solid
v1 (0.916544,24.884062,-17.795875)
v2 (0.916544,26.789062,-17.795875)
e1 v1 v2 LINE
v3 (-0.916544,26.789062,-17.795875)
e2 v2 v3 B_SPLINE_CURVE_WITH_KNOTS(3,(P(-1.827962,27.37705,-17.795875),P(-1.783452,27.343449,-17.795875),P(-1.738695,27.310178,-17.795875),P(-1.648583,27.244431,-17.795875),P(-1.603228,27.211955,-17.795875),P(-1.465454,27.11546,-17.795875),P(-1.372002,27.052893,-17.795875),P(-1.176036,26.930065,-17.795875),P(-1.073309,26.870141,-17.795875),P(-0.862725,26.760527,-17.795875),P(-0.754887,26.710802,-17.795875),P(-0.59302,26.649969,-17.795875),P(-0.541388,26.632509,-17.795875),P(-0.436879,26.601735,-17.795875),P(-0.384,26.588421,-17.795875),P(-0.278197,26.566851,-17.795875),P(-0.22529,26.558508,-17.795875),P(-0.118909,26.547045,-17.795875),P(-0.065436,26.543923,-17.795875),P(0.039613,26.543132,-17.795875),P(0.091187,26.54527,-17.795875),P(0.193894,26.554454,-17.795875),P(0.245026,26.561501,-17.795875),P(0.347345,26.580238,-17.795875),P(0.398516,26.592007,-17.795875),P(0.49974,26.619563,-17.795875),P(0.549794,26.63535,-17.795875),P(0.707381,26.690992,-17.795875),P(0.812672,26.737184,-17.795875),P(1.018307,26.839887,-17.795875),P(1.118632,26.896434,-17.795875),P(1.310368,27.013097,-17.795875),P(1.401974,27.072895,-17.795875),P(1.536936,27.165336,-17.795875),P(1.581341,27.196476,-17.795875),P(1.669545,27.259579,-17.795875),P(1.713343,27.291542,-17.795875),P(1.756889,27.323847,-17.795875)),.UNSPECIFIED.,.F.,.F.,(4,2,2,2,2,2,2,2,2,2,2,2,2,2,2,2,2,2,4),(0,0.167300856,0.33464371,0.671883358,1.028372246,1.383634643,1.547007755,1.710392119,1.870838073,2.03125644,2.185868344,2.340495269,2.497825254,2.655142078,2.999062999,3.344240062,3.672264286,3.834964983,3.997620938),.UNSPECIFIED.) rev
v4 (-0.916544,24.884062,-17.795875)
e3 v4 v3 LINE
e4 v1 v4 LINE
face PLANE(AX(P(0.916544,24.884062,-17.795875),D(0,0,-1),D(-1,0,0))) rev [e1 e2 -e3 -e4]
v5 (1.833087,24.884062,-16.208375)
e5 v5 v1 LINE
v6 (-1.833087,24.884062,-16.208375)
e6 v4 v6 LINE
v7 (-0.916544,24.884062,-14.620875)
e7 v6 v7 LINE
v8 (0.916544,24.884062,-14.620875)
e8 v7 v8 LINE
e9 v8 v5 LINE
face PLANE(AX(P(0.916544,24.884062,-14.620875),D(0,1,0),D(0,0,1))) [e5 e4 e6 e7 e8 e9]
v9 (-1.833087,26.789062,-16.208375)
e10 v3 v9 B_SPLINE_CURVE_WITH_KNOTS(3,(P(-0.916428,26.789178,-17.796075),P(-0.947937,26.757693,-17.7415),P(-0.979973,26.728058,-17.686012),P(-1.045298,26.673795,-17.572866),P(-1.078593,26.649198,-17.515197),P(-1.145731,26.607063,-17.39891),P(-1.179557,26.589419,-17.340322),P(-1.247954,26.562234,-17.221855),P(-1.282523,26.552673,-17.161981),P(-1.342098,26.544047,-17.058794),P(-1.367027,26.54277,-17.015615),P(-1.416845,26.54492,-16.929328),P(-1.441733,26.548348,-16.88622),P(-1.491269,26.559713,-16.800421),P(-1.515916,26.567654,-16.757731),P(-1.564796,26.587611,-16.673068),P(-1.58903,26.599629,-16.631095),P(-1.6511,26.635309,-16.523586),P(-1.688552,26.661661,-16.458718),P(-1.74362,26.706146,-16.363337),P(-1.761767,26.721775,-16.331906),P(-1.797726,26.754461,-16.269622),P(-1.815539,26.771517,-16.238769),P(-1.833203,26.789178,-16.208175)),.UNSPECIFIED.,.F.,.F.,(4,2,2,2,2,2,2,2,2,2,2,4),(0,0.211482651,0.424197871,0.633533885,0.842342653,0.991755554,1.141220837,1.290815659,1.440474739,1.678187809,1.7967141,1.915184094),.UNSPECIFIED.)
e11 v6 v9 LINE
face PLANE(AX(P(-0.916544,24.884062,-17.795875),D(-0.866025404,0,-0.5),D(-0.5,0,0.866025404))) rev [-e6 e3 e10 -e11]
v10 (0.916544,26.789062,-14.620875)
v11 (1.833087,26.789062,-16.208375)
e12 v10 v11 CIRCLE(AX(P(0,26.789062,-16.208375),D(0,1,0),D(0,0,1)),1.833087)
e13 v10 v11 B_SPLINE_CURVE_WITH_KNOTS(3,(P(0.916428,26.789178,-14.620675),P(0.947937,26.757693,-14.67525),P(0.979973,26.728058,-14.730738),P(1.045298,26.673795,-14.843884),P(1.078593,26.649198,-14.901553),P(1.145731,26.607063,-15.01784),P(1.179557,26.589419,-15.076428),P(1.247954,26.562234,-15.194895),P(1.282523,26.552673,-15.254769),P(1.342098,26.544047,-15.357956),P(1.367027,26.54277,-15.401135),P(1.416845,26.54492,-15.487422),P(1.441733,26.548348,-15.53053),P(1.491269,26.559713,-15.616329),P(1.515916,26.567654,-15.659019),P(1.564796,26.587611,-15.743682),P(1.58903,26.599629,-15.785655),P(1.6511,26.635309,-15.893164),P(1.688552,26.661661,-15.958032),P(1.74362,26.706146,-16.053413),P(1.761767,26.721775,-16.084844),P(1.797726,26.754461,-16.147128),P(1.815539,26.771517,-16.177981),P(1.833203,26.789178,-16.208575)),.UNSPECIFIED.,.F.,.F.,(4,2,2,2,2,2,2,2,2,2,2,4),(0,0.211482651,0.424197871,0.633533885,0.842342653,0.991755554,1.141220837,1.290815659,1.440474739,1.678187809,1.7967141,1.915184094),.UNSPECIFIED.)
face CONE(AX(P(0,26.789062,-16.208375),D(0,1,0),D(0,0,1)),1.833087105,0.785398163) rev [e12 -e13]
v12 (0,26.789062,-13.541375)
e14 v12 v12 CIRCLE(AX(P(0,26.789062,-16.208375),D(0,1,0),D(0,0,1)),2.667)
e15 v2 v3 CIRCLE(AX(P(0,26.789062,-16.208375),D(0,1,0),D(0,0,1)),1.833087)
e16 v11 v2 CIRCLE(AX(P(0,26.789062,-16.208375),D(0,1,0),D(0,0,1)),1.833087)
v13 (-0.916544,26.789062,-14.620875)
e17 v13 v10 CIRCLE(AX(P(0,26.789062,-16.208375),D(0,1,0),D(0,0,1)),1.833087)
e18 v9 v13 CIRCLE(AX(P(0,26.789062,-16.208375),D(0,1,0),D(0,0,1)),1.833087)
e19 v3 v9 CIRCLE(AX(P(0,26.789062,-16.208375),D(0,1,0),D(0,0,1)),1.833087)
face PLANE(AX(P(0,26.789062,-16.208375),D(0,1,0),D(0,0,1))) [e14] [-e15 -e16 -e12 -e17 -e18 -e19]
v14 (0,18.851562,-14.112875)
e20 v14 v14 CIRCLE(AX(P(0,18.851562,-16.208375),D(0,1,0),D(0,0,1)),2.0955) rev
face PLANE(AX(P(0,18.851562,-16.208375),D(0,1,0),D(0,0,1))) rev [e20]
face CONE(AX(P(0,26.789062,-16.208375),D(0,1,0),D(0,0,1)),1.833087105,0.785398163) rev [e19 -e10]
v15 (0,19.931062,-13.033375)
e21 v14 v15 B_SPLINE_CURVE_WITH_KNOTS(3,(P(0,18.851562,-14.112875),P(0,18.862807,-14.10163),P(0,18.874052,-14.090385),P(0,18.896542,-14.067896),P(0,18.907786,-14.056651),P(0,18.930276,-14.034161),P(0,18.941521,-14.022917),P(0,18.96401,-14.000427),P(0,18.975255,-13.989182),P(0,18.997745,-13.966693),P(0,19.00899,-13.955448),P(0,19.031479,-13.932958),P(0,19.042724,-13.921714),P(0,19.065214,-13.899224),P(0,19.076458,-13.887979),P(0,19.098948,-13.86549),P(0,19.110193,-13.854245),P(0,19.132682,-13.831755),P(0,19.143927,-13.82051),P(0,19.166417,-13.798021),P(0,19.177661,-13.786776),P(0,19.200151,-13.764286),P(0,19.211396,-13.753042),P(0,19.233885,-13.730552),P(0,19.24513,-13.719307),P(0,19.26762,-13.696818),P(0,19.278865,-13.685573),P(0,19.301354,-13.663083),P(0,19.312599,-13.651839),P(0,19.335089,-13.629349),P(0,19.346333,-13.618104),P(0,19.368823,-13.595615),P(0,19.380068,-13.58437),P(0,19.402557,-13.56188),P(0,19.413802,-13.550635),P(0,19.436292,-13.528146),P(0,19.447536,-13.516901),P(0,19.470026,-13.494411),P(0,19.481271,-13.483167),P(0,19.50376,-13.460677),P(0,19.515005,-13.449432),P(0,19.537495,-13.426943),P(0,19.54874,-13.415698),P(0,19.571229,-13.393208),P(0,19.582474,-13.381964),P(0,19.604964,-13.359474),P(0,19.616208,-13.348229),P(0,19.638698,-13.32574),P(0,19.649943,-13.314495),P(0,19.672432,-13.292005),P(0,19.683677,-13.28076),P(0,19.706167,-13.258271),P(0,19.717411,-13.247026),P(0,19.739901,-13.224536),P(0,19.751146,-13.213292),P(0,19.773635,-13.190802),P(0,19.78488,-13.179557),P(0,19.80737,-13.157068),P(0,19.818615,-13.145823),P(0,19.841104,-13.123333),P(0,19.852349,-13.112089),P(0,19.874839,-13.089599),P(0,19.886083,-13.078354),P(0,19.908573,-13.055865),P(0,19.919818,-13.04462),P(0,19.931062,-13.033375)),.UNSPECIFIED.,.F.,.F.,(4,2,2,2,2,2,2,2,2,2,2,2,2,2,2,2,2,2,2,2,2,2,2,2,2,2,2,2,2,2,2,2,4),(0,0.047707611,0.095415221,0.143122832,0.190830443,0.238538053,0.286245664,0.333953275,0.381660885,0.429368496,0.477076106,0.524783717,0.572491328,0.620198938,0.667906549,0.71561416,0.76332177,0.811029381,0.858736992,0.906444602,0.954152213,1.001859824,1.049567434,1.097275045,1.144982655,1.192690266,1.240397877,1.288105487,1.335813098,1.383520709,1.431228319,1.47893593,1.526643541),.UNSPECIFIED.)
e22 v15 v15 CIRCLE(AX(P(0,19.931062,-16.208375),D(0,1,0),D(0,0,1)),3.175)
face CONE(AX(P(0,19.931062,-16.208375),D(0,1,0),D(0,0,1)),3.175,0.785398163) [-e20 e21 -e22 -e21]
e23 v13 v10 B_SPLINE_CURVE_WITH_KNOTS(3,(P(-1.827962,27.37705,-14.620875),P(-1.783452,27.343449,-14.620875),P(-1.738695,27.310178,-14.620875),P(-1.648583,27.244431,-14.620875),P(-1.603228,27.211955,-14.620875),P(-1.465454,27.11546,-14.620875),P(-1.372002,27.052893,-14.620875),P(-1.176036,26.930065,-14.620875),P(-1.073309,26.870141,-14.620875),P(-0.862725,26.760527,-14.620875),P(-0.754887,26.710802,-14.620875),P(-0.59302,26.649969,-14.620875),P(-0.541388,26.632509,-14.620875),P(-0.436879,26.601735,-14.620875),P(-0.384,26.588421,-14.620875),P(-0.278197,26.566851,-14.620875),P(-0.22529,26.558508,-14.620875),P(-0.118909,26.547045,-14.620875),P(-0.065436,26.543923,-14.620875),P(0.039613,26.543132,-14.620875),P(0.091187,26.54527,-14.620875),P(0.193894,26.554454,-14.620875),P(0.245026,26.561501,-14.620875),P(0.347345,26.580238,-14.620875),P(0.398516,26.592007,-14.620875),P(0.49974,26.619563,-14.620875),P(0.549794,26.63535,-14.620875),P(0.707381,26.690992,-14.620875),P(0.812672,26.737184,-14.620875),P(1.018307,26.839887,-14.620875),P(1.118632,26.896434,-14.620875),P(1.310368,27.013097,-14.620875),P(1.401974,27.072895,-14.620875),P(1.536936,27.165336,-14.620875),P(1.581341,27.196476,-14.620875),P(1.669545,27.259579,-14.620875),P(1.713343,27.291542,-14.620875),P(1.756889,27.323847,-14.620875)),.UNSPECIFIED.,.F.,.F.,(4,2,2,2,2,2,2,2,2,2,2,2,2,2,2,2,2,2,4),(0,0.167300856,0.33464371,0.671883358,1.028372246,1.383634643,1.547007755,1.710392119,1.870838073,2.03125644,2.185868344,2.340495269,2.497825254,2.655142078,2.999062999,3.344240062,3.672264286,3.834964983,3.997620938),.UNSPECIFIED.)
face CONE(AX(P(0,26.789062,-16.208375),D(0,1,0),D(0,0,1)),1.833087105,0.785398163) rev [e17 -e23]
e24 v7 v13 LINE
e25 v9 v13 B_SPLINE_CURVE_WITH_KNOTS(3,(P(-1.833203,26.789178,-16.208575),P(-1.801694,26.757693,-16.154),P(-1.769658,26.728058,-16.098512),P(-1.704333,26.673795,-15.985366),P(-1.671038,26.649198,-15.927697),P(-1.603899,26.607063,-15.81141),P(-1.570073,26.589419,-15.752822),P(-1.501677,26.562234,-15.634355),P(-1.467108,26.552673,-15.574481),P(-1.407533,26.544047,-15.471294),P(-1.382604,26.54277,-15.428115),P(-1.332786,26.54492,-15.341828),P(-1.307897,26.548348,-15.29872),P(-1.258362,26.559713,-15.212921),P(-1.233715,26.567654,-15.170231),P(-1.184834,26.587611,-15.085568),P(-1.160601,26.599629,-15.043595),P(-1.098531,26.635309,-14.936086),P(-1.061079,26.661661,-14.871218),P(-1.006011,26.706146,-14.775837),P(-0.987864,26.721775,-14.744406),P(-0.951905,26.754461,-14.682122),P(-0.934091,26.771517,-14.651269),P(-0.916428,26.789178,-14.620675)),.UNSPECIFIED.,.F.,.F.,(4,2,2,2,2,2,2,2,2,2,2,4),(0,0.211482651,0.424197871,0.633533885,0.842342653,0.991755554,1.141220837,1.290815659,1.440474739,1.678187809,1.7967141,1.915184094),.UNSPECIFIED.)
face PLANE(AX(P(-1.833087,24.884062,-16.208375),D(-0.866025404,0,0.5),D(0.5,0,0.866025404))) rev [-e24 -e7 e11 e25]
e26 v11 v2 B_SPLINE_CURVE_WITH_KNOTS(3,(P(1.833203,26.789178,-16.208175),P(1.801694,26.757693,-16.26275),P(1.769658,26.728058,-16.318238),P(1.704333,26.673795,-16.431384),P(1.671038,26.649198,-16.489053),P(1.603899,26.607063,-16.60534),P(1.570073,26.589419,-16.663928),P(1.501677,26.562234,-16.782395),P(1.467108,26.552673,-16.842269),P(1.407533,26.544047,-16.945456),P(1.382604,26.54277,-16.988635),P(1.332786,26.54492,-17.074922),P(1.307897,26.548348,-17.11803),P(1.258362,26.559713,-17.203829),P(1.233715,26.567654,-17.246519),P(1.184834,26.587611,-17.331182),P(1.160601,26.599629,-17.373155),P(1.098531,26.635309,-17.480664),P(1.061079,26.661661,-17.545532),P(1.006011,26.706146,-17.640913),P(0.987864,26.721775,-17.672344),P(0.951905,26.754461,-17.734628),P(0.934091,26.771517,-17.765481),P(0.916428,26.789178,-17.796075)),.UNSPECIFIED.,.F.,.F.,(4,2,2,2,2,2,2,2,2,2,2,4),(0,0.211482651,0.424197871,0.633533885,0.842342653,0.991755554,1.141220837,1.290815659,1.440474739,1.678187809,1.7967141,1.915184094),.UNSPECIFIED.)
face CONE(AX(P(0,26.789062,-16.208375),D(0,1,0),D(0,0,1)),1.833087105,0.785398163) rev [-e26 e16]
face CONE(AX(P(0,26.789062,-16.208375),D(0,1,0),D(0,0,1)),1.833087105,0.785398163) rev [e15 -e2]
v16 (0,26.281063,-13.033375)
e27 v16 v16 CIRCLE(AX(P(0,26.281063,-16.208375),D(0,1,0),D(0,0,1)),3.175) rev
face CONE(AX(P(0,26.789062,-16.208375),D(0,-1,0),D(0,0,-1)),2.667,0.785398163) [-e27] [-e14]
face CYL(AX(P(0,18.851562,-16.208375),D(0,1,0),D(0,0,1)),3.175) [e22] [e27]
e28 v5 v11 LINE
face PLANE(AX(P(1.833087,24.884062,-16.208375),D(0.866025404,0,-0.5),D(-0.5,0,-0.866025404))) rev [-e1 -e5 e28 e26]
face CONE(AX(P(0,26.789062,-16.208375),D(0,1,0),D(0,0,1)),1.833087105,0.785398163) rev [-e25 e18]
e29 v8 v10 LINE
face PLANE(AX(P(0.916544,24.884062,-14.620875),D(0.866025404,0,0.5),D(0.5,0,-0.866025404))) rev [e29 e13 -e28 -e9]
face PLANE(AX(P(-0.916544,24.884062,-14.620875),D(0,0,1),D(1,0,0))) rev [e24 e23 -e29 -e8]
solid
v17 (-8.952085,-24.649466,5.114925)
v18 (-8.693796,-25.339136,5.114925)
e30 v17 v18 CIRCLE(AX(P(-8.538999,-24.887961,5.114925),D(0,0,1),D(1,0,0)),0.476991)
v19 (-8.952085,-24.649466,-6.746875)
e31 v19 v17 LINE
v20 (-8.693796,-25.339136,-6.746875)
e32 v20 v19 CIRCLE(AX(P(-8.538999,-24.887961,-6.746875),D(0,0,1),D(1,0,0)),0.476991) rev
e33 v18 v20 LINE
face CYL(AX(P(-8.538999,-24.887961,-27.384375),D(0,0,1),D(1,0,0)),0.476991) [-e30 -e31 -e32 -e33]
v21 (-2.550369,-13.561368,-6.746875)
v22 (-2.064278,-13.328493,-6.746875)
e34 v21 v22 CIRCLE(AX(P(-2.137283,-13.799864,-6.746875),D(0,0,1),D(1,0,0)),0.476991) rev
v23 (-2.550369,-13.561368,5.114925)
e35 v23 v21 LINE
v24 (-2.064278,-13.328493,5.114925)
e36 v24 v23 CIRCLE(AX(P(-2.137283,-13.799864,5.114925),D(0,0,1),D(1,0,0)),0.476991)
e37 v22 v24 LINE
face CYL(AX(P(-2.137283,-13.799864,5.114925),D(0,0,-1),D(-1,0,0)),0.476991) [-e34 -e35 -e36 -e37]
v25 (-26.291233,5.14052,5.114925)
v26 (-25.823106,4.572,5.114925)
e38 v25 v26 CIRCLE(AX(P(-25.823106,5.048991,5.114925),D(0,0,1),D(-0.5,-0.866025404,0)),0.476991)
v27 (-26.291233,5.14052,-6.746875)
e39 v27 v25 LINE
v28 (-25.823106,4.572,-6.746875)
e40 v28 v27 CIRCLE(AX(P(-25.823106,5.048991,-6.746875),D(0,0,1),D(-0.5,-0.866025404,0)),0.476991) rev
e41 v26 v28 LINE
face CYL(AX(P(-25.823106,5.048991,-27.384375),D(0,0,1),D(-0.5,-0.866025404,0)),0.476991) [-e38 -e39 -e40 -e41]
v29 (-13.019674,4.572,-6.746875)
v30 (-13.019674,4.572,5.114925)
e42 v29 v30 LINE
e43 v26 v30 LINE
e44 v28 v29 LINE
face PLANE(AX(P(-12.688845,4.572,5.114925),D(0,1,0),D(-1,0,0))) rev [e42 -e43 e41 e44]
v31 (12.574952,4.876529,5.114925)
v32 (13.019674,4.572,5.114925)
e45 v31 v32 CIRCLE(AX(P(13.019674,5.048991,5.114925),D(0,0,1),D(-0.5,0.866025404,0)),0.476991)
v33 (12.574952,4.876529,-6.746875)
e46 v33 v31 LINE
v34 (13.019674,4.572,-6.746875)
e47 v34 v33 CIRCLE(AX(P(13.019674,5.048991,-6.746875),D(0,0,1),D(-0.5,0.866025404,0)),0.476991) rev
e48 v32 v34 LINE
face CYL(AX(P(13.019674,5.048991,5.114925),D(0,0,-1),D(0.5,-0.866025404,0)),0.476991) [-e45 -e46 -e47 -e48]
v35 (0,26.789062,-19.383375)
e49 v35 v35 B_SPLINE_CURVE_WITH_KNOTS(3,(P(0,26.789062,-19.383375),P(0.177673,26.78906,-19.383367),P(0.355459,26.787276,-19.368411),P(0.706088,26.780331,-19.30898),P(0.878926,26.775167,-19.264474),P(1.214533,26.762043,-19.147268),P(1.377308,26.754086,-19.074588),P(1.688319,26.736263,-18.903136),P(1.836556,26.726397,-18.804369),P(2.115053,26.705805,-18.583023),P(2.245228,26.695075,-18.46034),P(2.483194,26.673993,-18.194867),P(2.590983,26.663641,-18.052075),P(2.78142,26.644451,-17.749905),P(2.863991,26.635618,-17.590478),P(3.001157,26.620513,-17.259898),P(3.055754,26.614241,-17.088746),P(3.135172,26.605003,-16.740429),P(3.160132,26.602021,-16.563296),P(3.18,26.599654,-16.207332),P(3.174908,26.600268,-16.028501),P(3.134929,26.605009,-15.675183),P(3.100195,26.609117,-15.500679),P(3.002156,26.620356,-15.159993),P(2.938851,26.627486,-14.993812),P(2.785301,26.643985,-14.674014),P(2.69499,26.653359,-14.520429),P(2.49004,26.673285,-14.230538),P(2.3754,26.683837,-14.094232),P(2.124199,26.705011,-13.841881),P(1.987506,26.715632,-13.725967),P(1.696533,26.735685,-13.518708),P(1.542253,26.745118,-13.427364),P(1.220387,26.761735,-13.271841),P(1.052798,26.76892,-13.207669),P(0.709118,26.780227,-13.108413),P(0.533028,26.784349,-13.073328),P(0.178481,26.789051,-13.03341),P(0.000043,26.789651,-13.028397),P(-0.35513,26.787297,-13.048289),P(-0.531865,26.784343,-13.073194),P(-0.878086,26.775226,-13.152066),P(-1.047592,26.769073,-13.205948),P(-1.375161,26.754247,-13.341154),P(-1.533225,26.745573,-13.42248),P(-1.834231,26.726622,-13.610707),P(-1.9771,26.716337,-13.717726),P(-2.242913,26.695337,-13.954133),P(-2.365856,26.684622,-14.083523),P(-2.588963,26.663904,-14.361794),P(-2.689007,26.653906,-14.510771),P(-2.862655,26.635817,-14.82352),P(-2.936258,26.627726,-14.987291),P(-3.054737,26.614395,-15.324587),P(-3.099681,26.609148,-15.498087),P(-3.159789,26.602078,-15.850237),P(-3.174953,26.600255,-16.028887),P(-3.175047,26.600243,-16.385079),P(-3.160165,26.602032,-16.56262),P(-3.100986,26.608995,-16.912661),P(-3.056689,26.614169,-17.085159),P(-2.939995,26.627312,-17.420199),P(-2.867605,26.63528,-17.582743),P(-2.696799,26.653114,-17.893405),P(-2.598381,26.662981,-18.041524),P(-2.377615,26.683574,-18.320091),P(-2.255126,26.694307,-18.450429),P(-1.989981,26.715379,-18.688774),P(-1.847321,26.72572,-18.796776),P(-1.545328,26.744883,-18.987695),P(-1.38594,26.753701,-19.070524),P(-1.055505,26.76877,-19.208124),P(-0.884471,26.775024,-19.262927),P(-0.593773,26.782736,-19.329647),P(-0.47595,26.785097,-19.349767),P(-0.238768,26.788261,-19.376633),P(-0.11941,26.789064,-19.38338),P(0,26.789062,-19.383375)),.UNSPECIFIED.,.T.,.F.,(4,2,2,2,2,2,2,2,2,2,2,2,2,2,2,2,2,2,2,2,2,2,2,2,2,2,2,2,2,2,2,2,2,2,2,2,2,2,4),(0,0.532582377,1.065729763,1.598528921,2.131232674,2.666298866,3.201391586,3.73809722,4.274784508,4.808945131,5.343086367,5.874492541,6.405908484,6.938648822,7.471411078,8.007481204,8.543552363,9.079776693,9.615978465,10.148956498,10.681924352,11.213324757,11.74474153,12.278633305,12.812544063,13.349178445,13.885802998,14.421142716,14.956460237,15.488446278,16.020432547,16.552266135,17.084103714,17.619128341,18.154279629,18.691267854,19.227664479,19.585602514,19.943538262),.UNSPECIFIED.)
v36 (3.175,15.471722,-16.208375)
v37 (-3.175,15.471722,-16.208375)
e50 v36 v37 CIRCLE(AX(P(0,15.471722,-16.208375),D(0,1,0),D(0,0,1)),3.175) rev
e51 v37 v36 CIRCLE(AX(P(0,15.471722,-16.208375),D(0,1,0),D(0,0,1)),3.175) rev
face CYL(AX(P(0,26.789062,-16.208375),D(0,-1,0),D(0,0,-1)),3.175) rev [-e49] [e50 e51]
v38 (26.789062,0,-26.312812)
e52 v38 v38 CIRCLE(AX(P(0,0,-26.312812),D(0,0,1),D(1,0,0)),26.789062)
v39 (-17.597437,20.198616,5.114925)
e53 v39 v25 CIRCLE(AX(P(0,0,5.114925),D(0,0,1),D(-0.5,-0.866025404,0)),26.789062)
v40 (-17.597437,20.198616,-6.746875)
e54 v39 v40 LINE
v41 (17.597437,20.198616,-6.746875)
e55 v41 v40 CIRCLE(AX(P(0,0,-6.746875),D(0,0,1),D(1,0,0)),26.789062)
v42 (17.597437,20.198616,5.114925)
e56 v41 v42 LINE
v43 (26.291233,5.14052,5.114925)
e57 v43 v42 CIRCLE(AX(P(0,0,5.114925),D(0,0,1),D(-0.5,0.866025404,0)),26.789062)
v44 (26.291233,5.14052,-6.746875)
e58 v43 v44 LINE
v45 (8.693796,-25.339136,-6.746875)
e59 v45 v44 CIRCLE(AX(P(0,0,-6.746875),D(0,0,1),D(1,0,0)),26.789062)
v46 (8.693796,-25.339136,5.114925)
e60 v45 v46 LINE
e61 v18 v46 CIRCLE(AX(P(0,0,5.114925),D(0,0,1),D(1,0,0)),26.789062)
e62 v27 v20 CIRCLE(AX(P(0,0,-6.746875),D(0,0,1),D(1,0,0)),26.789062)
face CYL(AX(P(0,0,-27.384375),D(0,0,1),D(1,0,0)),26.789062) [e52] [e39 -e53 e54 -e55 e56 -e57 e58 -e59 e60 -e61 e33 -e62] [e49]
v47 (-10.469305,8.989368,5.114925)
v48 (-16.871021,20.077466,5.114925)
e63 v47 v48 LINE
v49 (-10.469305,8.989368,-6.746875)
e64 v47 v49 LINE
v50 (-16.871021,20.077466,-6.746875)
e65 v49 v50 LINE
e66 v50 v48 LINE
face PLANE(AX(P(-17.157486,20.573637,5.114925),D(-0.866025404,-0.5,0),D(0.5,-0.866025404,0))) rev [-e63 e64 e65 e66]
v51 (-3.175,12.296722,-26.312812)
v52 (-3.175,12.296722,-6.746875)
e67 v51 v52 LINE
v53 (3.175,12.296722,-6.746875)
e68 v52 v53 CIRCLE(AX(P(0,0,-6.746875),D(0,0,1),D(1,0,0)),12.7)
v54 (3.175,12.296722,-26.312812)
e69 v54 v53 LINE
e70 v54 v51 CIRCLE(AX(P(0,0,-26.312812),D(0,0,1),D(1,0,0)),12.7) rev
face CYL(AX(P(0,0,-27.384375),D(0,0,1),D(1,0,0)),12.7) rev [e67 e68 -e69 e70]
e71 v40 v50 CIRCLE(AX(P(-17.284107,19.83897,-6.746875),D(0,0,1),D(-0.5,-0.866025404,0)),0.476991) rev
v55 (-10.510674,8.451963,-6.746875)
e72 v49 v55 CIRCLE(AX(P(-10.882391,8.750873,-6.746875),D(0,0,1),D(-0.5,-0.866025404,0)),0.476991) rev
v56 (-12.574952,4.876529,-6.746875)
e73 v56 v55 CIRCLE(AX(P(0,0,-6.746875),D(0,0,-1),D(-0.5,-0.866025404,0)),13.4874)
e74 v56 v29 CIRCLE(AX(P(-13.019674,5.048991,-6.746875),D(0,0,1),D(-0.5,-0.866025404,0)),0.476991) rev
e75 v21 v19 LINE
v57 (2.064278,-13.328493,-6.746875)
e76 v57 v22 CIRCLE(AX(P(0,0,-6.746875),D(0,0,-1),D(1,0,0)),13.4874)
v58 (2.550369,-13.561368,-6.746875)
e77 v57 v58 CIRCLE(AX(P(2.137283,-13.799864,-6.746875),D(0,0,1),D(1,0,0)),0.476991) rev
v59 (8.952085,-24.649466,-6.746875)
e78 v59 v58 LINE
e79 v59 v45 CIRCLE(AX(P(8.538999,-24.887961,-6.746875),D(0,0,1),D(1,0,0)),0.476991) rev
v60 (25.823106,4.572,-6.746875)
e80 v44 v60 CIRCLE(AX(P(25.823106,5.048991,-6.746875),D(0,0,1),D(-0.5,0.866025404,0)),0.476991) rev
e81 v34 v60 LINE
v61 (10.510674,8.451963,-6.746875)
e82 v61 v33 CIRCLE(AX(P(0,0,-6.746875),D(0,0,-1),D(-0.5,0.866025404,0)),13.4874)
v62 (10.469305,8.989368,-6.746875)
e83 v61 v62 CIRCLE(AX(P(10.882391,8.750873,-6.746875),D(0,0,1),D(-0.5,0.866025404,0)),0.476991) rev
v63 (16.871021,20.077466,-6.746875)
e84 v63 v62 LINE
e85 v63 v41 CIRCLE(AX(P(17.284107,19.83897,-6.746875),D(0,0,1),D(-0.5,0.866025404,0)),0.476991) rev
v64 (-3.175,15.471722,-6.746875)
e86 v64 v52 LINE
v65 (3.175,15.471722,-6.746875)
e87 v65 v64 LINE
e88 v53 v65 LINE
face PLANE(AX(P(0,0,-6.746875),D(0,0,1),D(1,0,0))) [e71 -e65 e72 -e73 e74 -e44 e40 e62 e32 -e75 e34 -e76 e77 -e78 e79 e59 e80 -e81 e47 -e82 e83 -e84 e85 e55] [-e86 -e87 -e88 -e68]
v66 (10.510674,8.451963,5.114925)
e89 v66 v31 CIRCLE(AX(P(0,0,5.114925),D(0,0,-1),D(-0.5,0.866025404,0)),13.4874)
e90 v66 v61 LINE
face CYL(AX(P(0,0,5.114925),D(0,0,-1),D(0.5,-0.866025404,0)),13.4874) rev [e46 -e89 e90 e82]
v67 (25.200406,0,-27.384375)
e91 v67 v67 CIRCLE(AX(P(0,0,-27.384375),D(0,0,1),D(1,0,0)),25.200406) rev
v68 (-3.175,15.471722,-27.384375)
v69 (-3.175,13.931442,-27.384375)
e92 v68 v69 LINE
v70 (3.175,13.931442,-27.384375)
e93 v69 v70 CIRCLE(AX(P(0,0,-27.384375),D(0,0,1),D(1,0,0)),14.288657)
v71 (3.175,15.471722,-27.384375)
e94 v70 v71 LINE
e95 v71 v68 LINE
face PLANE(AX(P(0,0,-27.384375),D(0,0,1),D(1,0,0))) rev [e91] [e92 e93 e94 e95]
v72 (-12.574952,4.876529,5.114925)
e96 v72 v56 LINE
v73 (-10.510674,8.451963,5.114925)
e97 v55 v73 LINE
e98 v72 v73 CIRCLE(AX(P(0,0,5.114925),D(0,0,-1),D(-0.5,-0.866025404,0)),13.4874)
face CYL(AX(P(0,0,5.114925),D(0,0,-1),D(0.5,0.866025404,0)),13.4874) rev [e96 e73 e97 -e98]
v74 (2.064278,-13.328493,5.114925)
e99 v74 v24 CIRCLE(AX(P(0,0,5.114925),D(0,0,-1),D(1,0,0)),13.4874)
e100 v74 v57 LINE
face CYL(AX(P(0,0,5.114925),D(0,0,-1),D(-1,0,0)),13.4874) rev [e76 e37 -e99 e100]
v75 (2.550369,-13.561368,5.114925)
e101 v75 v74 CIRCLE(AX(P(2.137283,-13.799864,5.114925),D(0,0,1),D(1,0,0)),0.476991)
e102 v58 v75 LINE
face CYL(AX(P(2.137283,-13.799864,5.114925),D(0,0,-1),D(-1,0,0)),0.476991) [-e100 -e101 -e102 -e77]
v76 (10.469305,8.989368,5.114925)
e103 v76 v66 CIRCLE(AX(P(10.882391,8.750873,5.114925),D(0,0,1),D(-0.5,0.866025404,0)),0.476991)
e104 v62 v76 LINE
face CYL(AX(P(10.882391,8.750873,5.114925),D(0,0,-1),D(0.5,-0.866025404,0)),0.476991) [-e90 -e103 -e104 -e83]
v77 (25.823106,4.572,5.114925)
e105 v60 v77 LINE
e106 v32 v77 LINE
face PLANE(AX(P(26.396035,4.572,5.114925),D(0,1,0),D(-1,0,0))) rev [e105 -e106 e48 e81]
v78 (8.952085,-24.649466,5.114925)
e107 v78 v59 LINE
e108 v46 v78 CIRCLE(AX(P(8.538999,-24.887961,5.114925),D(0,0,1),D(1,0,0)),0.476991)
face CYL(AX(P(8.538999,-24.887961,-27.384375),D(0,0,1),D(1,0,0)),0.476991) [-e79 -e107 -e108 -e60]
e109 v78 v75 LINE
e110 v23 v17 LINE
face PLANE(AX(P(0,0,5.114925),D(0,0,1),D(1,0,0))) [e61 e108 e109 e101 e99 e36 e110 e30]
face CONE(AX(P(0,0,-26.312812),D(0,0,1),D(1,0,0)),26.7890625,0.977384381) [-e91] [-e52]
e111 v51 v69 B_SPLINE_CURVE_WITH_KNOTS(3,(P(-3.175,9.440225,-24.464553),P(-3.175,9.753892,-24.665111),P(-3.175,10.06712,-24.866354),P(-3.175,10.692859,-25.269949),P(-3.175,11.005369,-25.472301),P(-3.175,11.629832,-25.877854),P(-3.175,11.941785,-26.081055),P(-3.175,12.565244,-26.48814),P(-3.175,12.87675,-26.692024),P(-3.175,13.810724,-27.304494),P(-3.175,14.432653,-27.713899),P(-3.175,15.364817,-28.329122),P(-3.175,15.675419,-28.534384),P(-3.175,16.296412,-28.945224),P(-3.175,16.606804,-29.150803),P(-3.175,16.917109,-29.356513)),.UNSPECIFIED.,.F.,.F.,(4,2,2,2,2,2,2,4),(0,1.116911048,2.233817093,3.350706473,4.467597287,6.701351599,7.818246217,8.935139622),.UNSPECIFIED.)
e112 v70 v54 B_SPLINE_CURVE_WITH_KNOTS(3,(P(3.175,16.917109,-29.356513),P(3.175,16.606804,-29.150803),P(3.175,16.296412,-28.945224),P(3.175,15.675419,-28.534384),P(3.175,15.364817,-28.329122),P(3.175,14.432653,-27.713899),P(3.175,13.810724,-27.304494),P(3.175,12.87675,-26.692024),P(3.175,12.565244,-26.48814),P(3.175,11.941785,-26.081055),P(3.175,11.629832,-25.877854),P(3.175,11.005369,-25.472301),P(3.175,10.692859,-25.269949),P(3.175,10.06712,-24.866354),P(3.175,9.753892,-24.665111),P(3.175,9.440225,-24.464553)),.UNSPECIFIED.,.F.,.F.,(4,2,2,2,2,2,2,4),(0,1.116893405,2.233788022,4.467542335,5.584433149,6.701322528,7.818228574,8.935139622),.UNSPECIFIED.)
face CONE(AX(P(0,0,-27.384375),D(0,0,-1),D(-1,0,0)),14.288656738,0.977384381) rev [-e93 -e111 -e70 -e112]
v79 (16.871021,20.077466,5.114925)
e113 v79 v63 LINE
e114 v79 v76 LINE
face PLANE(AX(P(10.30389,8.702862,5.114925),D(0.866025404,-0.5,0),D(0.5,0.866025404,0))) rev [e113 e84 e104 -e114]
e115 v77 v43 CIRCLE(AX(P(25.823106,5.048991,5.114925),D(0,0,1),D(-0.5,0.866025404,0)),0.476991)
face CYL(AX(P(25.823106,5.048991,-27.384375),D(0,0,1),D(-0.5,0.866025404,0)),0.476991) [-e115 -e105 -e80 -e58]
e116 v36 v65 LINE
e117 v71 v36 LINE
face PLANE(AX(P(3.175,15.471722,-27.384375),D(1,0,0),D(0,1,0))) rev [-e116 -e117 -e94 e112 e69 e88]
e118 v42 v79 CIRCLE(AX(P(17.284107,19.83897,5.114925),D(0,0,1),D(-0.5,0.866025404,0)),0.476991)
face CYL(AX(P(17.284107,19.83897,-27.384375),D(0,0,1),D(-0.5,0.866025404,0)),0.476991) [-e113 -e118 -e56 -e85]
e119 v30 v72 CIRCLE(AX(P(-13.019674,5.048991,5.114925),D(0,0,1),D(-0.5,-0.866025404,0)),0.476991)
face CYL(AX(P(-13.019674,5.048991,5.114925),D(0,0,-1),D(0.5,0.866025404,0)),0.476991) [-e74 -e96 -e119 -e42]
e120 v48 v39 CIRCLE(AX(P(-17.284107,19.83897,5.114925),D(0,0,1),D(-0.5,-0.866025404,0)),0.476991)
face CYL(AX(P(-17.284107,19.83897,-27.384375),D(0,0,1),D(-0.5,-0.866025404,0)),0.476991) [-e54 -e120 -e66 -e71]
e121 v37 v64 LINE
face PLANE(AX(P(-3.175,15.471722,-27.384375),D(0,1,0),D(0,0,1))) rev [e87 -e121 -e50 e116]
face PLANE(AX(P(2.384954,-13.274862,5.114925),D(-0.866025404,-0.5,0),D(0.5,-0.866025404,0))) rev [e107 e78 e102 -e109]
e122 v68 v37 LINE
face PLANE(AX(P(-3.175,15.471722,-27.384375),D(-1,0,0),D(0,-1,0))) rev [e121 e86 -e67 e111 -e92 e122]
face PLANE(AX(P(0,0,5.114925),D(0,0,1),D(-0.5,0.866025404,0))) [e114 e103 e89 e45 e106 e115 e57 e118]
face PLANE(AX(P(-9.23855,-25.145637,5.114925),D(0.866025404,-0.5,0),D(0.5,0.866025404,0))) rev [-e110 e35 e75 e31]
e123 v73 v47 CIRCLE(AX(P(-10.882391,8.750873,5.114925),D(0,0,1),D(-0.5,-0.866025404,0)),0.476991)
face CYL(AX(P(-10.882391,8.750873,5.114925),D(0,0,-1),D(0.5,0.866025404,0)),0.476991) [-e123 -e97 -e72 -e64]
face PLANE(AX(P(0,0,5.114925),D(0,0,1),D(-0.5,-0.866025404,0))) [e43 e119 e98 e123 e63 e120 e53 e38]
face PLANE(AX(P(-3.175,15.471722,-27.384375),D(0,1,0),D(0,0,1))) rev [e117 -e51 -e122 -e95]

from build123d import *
from OCP.BRepFilletAPI import BRepFilletAPI_MakeChamfer

# Parameters (mm, degrees)
BOSS_EXTRUDE1_START      = -6.746875
SKETCH1_R                = 26.7890625
BOSS_EXTRUDE1_DEPTH      = 20.6375
BOSS_EXTRUDE2_DEPTH      = 11.8618
FILLET1_R                = 0.476990821
CIRPATTERN1_COUNT        = 3
FILLET1_OF_CIRPATTERN1_R = 0.476990821
CUT_EXTRUDE5_DEPTH       = 47.746248335
CUT_EXTRUDE5_DEPTH_BACK  = 47.746248335
SKETCH15_R               = 12.7
CHAMFER1_SIZE            = 1.0715625
CHAMFER1_SIZE2           = 1.588656738
CUT_EXTRUDE1_DEPTH       = 47.746248335
CUT_EXTRUDE1_DEPTH_BACK  = 47.746248335
SKETCH5_R                = 3.175
CUT_EXTRUDE2_DEPTH       = 47.746248335
SKETCH6_R                = 3.175
BOSS_EXTRUDE3_DEPTH      = 7.9375
CUT_EXTRUDE3_DEPTH       = 1.905
CHAMFER3_SIZE            = 0.508
CHAMFER4_SIZE            = 1.0795


with BuildPart() as part:
    # Sketch1 → Boss-Extrude1 (new body)
    with BuildSketch(Plane.XY.offset(BOSS_EXTRUDE1_START)):
        Circle(SKETCH1_R)
    extrude(amount=-BOSS_EXTRUDE1_DEPTH)

    # Sketch2 → Boss-Extrude2 (add)
    with BuildSketch(Plane.XY.offset(-6.746875)):
        with BuildLine():
            Line((-9.238549561, -25.145637229), (-2.384954104, -13.274861682))
            ThreePointArc((-2.384954104, -13.274861682), (0, -13.4874), (2.384954104, -13.274861682))
            Line((2.384954104, -13.274861682), (9.238549561, -25.145637229))
            ThreePointArc((9.238549561, -25.145637229), (0, -26.7890625), (-9.238549561, -25.145637229))
        make_face()
    boss_extrude2 = extrude(amount=BOSS_EXTRUDE2_DEPTH)

    # Fillet1
    # the kernel refuses this fillet: 0.476990821 mm, written as the material it takes off along each edge
    with BuildSketch(Plane(origin=(-9.238549561, -25.145637229, -6.746875), x_dir=(0.9423194959651416, -0.33471475546202245, 0), z_dir=(0, 0, 1))) as fillet1_piece_1:
        with BuildLine():
            CenterArc((0.572952448, 0.476963054), FILLET1_R, 169.55519331, 101.063030663)
            Line((0.103865366, 0.563435893), (0, 0))
            ThreePointArc((0, 0), (0.28904955, -0.001559444), (0.5780991, 0))
        make_face()
    extrude(amount=13.307047751, mode=Mode.SUBTRACT)
    with BuildSketch(Plane(origin=(9.238549561, -25.145637229, -6.746875), x_dir=(-0.9423194959651411, -0.3347147554620237, 0), z_dir=(0, 0, 1))) as fillet1_piece_2:
        with BuildLine():
            CenterArc((0.572952448, -0.476963054), FILLET1_R, 89.381776027, 101.063030663)
            Line((0.103865366, -0.563435893), (0, 0))
            ThreePointArc((0, 0), (0.28904955, 0.001559444), (0.5780991, 0))
        make_face()
    extrude(amount=13.307047751, mode=Mode.SUBTRACT)
    with BuildSketch(Plane(origin=(2.384954104, -13.274861682, -6.746875), x_dir=(0.49999999999999706, -0.8660254037844404, 0), z_dir=(0, 0, 1))) as fillet1_piece_3:
        with BuildLine():
            CenterArc((0.330829178, -0.476990821), FILLET1_R, 90, 68.803855098)
            ThreePointArc((-0.113892323, -0.304529143), (-0.056028498, -0.152607773), (0, 0))
            Line((0, 0), (0.330829178, 0))
        make_face()
    extrude(amount=12.688872944, mode=Mode.SUBTRACT)
    with BuildSketch(Plane(origin=(-2.384954104, -13.274861682, -6.746875), x_dir=(0.9863015455813384, -0.16495229972286882, 0), z_dir=(0, 0, 1))) as fillet1_piece_4:
        with BuildLine():
            CenterArc((0.330879129, -0.476956172), FILLET1_R, 90.690608377, 68.803855098)
            Line((-0.115888763, -0.309867293), (0, 0))
            ThreePointArc((0, 0), (0.162564956, -0.000979741), (0.325129912, 0))
        make_face()
    extrude(amount=12.688872944, mode=Mode.SUBTRACT)

    # CirPattern1: Boss-Extrude2 ×3 about axis
    cirpattern1_axis = Axis((0, 0, 0), (0, 0, 1))
    for i in range(1, CIRPATTERN1_COUNT):
        add(boss_extrude2.rotate(cirpattern1_axis, i * 360 / CIRPATTERN1_COUNT))

    # Fillet1 of CirPattern1
    # the kernel refuses this fillet: 0.476990821 mm, written as the material it takes off along each edge
    with BuildSketch(Plane(origin=(26.396035415, 4.572, -6.746875), x_dir=(-0.18128826673094764, 0.9834299997181745, 0), z_dir=(0, 0, 1)), Plane(origin=(-17.157485854, 20.573637229, -6.746875), x_dir=(-0.761031229234182, -0.6487152442561451, 0), z_dir=(0, 0, 1))) as fillet1_of_cirpattern1_piece_1:
        with BuildLine():
            CenterArc((0.572952448, 0.476963054), FILLET1_OF_CIRPATTERN1_R, 169.55519331, 101.063030663)
            Line((0.103865366, 0.563435893), (0, 0))
            ThreePointArc((0, 0), (0.28904955, -0.001559444), (0.5780991, 0))
        make_face()
    extrude(amount=13.307047751, mode=Mode.SUBTRACT)
    with BuildSketch(Plane(origin=(17.157485854, 20.573637229, -6.746875), x_dir=(0.7610312292341833, -0.6487152442561435, 0), z_dir=(0, 0, 1)), Plane(origin=(-26.396035415, 4.572, -6.746875), x_dir=(0.181288266730962, 0.9834299997181718, 0), z_dir=(0, 0, 1))) as fillet1_of_cirpattern1_piece_2:
        with BuildLine():
            CenterArc((0.572952448, -0.476963054), FILLET1_OF_CIRPATTERN1_R, 89.381776027, 101.063030663)
            Line((0.103865366, -0.563435893), (0, 0))
            ThreePointArc((0, 0), (0.28904955, 0.001559444), (0.5780991, 0))
        make_face()
    extrude(amount=13.307047751, mode=Mode.SUBTRACT)
    with BuildSketch(Plane(origin=(10.303890396, 8.702861682, -6.746875), x_dir=(0.5000000000000006, 0.8660254037844383, 0), z_dir=(0, 0, 1)), Plane(origin=(-12.688844501, 4.572, -6.746875), x_dir=(-1, 0, 0), z_dir=(0, 0, 1))) as fillet1_of_cirpattern1_piece_3:
        with BuildLine():
            CenterArc((0.330829178, -0.476990821), FILLET1_OF_CIRPATTERN1_R, 90, 68.803855098)
            ThreePointArc((-0.113892323, -0.304529143), (-0.056028498, -0.152607773), (0, 0))
            Line((0, 0), (0.330829178, 0))
        make_face()
    extrude(amount=12.688872944, mode=Mode.SUBTRACT)
    with BuildSketch(Plane(origin=(12.688844501, 4.572, -6.746875), x_dir=(-0.3502978908180006, 0.9366383441267288, 0), z_dir=(0, 0, 1)), Plane(origin=(-10.303890396, 8.702861682, -6.746875), x_dir=(-0.6360036547633316, -0.7716860444038657, 0), z_dir=(0, 0, 1))) as fillet1_of_cirpattern1_piece_4:
        with BuildLine():
            CenterArc((0.330879129, -0.476956172), FILLET1_OF_CIRPATTERN1_R, 90.690608377, 68.803855098)
            Line((-0.115888763, -0.309867293), (0, 0))
            ThreePointArc((0, 0), (0.162564956, -0.000979741), (0.325129912, 0))
        make_face()
    extrude(amount=12.688872944, mode=Mode.SUBTRACT)

    # Sketch15 → Cut-Extrude5 (cut, two sides: drawn at the far end of the back side and taken through both)
    with BuildSketch(Plane.XY.offset(-CUT_EXTRUDE5_DEPTH_BACK)):
        Circle(SKETCH15_R)
    extrude(amount=CUT_EXTRUDE5_DEPTH + CUT_EXTRUDE5_DEPTH_BACK, mode=Mode.SUBTRACT)

    # Chamfer1: one chamfer whose edges measure the first distance from different faces: ONE call of the kernel's chamfer builder (chamfer() names one face for all edges)
    chamfer1_edges_1 = [part.edges().sort_by_distance(p)[0] for p in [
        (-26.7890625, 0, -27.384375),
    ]]
    chamfer1_side_1 = [part.faces().sort_by_distance(p)[0] for p in [
        (-26.7890625, 0, -17.065625),
    ]]
    chamfer1_edges_2 = [part.edges().sort_by_distance(p)[0] for p in [
        (-12.7, 0, -27.384375),
    ]]
    chamfer1_side_2 = [part.faces().sort_by_distance(p)[0] for p in [
        (-12.7, 0, -17.065625),
    ]]
    chamfer1 = BRepFilletAPI_MakeChamfer(part.part.solid().wrapped)
    for e in chamfer1_edges_1:
        chamfer1.Add(CHAMFER1_SIZE, CHAMFER1_SIZE2, e.wrapped, chamfer1_side_1[0].wrapped)  # the first distance lies on this face
    for e in chamfer1_edges_2:
        chamfer1.Add(CHAMFER1_SIZE, CHAMFER1_SIZE2, e.wrapped, chamfer1_side_2[0].wrapped)  # the first distance lies on this face
    add(Compound.cast(chamfer1.Shape()), mode=Mode.REPLACE)

    # Sketch4 → Cut-Extrude1 (cut, two sides: drawn at the far end of the back side and taken through both)
    with BuildSketch(Plane.XY.offset(-CUT_EXTRUDE1_DEPTH_BACK)):
        with BuildLine():
            Line((-3.175, 15.471722124), (3.175, 15.471722124))
            Line((3.175, 15.471722124), (3.175, 12.296722124))
            ThreePointArc((3.175, 12.296722124), (0, 12.7), (-3.175, 12.296722124))
            Line((-3.175, 12.296722124), (-3.175, 15.471722124))
        make_face()
    extrude(amount=CUT_EXTRUDE1_DEPTH + CUT_EXTRUDE1_DEPTH_BACK, mode=Mode.SUBTRACT)

    # Sketch5 → Cut-Extrude2 (cut, through all)
    with BuildSketch(Plane(origin=(0, 0, 0), x_dir=(1, 0, 0), z_dir=(0, 1, 0))):
        with Locations(Location((0, 16.208375, 0), (0, 0, 90))):
            Circle(SKETCH5_R)
    extrude(amount=CUT_EXTRUDE2_DEPTH, mode=Mode.SUBTRACT)


with BuildPart() as body_2:
    # Sketch6 → Boss-Extrude3 (new body)
    with BuildSketch(Plane(origin=(0, 26.7890625, 0), x_dir=(-1, 0, 0), z_dir=(0, 1, 0))):
        with Locations(Location((0, -16.208375, 0), (0, 0, 90))):
            Circle(SKETCH6_R)
    extrude(amount=-BOSS_EXTRUDE3_DEPTH)

    # Sketch8 → Cut-Extrude3 (cut)
    with BuildSketch(Plane(origin=(0, 26.7890625, 0), x_dir=(1, 0, 0), z_dir=(0, 1, 0))):
        Polygon((0.916543552, 14.620875), (1.833087105, 16.208375), (0.916543552, 17.795875), (-0.916543552, 17.795875), (-1.833087105, 16.208375), (-0.916543552, 14.620875), align=None)
    extrude(amount=-CUT_EXTRUDE3_DEPTH, mode=Mode.SUBTRACT)

    # Cut-Extrude4 cone 1 section (through the dimple's axis) → Cut-Extrude4 (revolve, cut)
    with BuildSketch(Plane(origin=(0, 26.7890625, -16.208375), x_dir=(0, 0, 1), z_dir=(1, 0, 0))):
        Polygon((0, 0), (1.833087105, 0), (0, 1.833087105), align=None)
    revolve(axis=Axis((0, 26.7890625, -16.208375), (0, -1, 0)), mode=Mode.SUBTRACT)

    # Chamfer3
    chamfer3_edges = [body_2.edges().sort_by_distance(p)[0] for p in [
        (0, 26.7890625, -19.383375),
    ]]
    chamfer(chamfer3_edges, length=CHAMFER3_SIZE)

    # Chamfer4
    chamfer4_edges = [body_2.edges().sort_by_distance(p)[0] for p in [
        (0, 18.8515625, -19.383375),
    ]]
    chamfer(chamfer4_edges, length=CHAMFER4_SIZE)


solid = Compound([part.part, body_2.part])
